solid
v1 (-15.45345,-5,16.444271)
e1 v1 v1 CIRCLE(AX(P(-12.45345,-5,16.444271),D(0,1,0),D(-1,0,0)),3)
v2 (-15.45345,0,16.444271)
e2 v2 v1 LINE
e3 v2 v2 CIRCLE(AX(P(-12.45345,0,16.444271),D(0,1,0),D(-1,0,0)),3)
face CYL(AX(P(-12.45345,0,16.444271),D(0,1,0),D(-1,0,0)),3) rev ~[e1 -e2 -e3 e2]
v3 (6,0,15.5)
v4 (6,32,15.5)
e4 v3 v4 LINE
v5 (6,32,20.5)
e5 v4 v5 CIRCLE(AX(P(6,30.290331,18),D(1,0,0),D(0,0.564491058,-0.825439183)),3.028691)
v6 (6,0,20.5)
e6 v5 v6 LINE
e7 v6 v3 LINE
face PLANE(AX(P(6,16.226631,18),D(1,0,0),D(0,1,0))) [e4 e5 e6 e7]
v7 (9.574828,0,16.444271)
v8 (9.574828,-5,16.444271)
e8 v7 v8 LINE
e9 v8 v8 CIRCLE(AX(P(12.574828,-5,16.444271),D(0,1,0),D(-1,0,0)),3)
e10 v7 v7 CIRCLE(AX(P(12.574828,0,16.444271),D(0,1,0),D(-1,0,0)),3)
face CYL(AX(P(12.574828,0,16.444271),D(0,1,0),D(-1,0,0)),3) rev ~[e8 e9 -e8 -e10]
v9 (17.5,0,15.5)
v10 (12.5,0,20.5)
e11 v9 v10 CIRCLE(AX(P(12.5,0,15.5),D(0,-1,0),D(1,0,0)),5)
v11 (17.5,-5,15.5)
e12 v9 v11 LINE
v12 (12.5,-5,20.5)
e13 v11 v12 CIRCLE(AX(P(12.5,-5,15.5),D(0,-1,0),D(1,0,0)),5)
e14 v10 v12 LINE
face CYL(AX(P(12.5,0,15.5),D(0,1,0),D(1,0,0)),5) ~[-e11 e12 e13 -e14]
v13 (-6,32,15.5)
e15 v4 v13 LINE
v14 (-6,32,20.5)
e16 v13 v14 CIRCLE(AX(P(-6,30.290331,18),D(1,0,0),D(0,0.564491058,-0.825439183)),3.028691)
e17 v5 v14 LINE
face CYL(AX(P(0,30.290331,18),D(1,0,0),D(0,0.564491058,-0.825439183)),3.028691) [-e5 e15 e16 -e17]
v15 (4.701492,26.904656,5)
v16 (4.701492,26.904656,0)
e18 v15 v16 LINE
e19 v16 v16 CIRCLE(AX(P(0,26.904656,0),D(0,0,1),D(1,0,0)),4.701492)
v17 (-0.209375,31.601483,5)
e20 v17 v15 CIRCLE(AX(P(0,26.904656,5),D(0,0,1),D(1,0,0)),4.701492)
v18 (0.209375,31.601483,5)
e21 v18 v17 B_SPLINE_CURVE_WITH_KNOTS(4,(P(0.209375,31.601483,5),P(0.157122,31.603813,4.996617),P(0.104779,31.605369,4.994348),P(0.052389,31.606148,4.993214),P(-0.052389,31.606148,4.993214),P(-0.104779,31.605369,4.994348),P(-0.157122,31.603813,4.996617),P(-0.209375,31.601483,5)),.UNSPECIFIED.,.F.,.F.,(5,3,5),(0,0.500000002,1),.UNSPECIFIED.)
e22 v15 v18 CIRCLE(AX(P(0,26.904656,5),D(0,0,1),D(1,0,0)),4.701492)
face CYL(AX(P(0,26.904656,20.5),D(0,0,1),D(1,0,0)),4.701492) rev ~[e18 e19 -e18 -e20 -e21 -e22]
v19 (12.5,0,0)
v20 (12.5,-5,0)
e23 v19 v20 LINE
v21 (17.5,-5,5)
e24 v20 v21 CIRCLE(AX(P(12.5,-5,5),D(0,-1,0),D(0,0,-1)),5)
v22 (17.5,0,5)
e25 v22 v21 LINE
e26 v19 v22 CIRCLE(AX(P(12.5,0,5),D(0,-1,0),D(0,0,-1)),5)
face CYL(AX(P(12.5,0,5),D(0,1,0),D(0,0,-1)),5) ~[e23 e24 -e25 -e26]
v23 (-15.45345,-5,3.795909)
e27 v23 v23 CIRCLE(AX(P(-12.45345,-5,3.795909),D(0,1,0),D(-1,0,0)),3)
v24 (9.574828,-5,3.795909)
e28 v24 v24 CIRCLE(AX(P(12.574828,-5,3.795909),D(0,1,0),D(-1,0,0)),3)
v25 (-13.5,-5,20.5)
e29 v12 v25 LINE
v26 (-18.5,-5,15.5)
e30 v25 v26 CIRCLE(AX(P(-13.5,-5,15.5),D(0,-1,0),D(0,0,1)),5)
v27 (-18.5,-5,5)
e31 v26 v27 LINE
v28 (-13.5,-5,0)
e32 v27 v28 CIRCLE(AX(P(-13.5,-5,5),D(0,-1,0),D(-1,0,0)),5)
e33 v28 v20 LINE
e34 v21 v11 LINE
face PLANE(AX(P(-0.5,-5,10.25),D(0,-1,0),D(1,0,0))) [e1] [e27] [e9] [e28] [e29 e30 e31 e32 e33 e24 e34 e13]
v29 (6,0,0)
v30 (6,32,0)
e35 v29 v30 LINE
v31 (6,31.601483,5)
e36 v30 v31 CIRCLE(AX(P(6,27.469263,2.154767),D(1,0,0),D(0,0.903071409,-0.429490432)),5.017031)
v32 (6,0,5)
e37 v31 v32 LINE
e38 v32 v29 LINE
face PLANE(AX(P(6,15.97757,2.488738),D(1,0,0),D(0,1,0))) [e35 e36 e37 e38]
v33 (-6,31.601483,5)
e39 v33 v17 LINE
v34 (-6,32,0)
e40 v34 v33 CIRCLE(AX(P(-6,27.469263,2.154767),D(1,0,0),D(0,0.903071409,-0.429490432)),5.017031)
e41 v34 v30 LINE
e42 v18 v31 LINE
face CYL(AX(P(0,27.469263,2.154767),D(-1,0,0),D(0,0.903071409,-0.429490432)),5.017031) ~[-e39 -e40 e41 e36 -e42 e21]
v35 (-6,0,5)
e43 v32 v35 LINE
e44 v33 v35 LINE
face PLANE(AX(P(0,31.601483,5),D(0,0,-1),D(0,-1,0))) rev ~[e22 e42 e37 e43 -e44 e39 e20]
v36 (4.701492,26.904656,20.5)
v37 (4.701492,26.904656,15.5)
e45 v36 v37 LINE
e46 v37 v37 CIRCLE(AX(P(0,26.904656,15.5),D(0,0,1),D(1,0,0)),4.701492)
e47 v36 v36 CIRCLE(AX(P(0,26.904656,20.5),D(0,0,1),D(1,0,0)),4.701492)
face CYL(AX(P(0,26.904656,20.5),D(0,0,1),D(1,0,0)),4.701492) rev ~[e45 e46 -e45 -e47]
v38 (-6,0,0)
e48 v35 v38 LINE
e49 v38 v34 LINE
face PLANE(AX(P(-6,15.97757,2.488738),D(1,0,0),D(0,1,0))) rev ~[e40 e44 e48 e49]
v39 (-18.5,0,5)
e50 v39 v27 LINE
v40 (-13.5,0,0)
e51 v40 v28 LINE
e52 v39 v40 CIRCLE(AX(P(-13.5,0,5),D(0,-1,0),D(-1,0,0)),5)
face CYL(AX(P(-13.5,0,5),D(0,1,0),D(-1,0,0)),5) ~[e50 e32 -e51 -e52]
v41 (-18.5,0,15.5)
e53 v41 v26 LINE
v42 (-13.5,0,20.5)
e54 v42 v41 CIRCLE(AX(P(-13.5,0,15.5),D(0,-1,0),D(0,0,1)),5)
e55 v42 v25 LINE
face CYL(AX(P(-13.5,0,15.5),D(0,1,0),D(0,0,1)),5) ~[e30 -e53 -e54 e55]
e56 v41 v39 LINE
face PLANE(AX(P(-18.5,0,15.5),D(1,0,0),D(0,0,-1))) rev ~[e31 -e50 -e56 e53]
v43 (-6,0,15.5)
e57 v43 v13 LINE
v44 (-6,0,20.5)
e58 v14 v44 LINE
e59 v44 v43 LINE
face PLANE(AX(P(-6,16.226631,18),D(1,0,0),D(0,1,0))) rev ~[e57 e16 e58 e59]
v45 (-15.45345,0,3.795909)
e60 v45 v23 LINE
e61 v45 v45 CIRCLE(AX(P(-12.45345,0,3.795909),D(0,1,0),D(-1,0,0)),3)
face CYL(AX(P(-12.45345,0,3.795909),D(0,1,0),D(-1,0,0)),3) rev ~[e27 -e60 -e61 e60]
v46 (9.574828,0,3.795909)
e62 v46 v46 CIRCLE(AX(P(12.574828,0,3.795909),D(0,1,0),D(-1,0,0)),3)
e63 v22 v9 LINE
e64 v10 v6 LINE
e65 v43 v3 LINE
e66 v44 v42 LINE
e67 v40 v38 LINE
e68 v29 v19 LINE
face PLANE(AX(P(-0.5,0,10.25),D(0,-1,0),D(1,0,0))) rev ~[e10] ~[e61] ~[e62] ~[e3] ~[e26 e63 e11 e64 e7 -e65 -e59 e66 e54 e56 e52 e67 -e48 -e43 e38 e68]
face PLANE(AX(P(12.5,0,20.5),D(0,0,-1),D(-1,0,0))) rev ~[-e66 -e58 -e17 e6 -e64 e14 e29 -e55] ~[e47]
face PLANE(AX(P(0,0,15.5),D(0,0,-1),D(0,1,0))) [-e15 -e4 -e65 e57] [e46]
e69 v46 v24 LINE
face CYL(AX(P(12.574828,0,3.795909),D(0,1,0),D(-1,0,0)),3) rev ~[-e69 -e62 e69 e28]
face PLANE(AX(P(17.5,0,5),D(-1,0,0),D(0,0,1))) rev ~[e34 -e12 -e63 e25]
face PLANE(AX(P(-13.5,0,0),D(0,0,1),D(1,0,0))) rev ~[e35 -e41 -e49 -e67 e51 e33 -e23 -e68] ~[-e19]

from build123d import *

# Parameters (mm, degrees)
F1_DEPTH = 5
F3_DEPTH = 6
F4_R     = 3
F5_DEPTH = 5
F6_R     = 4.7014922297
F7_DEPTH = 25


# Not quite as in the source:
# - a feature names something its author has since deleted; it is built from what else it names


with BuildPart() as f1:
    # F0 (on Front) → F1 (new body)
    with BuildSketch(Plane.XZ):
        with BuildLine():
            Line((-13.5, 0), (0, 0))
            Line((0, 0), (12.5000002478, 0))
            ThreePointArc((12.5000002478, 0), (16.0355341537, 1.4644660941), (17.5000002478, 5))
            Line((17.5000002478, 5), (17.5000002478, 15.5))
            ThreePointArc((17.5000002478, 15.5), (16.0355341537, 19.0355339059), (12.5000002478, 20.5))
            Line((12.5000002478, 20.5), (0, 20.5))
            Line((0, 20.5), (-13.5, 20.5))
            ThreePointArc((-13.5, 20.5), (-17.0355339059, 19.0355339059), (-18.5, 15.5))
            Line((-18.5, 15.5), (-18.5, 5))
            ThreePointArc((-18.5, 5), (-17.0355339059, 1.4644660941), (-13.5, 0))
        make_face()
    extrude(amount=F1_DEPTH)

    # F2 (on Right) → F3 (join, symmetric)
    with BuildSketch(Plane.YZ):
        with BuildLine():
            Line((0, 4.0980060585), (0, 0))
            Line((0, 0), (32, 0))
            ThreePointArc((32, 0), (32.4704336179, 2.5533766687), (31.6014834029, 5))
            Line((31.6014834029, 5), (22.881918614, 5))
            Line((22.881918614, 5), (0, 5))
            Line((0, 5), (0, 4.0980060585))
        make_face()
        with BuildLine():
            Line((32, 20.5), (0, 20.5))
            Line((0, 20.5), (0, 15.5))
            Line((0, 15.5), (32, 15.5))
            ThreePointArc((32, 15.5), (33.3190218942, 18), (32, 20.5))
        make_face()
    extrude(amount=F3_DEPTH, both=True)

    # F4 (on face) → F5 (cut)
    with BuildSketch(Plane(origin=(0, 0, 0), x_dir=(-1, 0, 0), z_dir=(0, 1, 0))):
        with Locations((12.4534495048, 16.4442711417)):
            Circle(F4_R)
        with Locations((12.4534495048, 3.7959093649)):
            Circle(F4_R)
        with Locations((-12.5748278123, 16.4442711417)):
            Circle(F4_R)
        with Locations((-12.5748278123, 3.7959093649)):
            Circle(F4_R)
    extrude(amount=-F5_DEPTH, mode=Mode.SUBTRACT)

    # F6 (on face) → F7 (cut)
    with BuildSketch(Plane.XY.offset(20.5)):
        with Locations((0, 26.9046556205)):
            Circle(F6_R)
    extrude(amount=-F7_DEPTH, mode=Mode.SUBTRACT)


solid = f1.part
